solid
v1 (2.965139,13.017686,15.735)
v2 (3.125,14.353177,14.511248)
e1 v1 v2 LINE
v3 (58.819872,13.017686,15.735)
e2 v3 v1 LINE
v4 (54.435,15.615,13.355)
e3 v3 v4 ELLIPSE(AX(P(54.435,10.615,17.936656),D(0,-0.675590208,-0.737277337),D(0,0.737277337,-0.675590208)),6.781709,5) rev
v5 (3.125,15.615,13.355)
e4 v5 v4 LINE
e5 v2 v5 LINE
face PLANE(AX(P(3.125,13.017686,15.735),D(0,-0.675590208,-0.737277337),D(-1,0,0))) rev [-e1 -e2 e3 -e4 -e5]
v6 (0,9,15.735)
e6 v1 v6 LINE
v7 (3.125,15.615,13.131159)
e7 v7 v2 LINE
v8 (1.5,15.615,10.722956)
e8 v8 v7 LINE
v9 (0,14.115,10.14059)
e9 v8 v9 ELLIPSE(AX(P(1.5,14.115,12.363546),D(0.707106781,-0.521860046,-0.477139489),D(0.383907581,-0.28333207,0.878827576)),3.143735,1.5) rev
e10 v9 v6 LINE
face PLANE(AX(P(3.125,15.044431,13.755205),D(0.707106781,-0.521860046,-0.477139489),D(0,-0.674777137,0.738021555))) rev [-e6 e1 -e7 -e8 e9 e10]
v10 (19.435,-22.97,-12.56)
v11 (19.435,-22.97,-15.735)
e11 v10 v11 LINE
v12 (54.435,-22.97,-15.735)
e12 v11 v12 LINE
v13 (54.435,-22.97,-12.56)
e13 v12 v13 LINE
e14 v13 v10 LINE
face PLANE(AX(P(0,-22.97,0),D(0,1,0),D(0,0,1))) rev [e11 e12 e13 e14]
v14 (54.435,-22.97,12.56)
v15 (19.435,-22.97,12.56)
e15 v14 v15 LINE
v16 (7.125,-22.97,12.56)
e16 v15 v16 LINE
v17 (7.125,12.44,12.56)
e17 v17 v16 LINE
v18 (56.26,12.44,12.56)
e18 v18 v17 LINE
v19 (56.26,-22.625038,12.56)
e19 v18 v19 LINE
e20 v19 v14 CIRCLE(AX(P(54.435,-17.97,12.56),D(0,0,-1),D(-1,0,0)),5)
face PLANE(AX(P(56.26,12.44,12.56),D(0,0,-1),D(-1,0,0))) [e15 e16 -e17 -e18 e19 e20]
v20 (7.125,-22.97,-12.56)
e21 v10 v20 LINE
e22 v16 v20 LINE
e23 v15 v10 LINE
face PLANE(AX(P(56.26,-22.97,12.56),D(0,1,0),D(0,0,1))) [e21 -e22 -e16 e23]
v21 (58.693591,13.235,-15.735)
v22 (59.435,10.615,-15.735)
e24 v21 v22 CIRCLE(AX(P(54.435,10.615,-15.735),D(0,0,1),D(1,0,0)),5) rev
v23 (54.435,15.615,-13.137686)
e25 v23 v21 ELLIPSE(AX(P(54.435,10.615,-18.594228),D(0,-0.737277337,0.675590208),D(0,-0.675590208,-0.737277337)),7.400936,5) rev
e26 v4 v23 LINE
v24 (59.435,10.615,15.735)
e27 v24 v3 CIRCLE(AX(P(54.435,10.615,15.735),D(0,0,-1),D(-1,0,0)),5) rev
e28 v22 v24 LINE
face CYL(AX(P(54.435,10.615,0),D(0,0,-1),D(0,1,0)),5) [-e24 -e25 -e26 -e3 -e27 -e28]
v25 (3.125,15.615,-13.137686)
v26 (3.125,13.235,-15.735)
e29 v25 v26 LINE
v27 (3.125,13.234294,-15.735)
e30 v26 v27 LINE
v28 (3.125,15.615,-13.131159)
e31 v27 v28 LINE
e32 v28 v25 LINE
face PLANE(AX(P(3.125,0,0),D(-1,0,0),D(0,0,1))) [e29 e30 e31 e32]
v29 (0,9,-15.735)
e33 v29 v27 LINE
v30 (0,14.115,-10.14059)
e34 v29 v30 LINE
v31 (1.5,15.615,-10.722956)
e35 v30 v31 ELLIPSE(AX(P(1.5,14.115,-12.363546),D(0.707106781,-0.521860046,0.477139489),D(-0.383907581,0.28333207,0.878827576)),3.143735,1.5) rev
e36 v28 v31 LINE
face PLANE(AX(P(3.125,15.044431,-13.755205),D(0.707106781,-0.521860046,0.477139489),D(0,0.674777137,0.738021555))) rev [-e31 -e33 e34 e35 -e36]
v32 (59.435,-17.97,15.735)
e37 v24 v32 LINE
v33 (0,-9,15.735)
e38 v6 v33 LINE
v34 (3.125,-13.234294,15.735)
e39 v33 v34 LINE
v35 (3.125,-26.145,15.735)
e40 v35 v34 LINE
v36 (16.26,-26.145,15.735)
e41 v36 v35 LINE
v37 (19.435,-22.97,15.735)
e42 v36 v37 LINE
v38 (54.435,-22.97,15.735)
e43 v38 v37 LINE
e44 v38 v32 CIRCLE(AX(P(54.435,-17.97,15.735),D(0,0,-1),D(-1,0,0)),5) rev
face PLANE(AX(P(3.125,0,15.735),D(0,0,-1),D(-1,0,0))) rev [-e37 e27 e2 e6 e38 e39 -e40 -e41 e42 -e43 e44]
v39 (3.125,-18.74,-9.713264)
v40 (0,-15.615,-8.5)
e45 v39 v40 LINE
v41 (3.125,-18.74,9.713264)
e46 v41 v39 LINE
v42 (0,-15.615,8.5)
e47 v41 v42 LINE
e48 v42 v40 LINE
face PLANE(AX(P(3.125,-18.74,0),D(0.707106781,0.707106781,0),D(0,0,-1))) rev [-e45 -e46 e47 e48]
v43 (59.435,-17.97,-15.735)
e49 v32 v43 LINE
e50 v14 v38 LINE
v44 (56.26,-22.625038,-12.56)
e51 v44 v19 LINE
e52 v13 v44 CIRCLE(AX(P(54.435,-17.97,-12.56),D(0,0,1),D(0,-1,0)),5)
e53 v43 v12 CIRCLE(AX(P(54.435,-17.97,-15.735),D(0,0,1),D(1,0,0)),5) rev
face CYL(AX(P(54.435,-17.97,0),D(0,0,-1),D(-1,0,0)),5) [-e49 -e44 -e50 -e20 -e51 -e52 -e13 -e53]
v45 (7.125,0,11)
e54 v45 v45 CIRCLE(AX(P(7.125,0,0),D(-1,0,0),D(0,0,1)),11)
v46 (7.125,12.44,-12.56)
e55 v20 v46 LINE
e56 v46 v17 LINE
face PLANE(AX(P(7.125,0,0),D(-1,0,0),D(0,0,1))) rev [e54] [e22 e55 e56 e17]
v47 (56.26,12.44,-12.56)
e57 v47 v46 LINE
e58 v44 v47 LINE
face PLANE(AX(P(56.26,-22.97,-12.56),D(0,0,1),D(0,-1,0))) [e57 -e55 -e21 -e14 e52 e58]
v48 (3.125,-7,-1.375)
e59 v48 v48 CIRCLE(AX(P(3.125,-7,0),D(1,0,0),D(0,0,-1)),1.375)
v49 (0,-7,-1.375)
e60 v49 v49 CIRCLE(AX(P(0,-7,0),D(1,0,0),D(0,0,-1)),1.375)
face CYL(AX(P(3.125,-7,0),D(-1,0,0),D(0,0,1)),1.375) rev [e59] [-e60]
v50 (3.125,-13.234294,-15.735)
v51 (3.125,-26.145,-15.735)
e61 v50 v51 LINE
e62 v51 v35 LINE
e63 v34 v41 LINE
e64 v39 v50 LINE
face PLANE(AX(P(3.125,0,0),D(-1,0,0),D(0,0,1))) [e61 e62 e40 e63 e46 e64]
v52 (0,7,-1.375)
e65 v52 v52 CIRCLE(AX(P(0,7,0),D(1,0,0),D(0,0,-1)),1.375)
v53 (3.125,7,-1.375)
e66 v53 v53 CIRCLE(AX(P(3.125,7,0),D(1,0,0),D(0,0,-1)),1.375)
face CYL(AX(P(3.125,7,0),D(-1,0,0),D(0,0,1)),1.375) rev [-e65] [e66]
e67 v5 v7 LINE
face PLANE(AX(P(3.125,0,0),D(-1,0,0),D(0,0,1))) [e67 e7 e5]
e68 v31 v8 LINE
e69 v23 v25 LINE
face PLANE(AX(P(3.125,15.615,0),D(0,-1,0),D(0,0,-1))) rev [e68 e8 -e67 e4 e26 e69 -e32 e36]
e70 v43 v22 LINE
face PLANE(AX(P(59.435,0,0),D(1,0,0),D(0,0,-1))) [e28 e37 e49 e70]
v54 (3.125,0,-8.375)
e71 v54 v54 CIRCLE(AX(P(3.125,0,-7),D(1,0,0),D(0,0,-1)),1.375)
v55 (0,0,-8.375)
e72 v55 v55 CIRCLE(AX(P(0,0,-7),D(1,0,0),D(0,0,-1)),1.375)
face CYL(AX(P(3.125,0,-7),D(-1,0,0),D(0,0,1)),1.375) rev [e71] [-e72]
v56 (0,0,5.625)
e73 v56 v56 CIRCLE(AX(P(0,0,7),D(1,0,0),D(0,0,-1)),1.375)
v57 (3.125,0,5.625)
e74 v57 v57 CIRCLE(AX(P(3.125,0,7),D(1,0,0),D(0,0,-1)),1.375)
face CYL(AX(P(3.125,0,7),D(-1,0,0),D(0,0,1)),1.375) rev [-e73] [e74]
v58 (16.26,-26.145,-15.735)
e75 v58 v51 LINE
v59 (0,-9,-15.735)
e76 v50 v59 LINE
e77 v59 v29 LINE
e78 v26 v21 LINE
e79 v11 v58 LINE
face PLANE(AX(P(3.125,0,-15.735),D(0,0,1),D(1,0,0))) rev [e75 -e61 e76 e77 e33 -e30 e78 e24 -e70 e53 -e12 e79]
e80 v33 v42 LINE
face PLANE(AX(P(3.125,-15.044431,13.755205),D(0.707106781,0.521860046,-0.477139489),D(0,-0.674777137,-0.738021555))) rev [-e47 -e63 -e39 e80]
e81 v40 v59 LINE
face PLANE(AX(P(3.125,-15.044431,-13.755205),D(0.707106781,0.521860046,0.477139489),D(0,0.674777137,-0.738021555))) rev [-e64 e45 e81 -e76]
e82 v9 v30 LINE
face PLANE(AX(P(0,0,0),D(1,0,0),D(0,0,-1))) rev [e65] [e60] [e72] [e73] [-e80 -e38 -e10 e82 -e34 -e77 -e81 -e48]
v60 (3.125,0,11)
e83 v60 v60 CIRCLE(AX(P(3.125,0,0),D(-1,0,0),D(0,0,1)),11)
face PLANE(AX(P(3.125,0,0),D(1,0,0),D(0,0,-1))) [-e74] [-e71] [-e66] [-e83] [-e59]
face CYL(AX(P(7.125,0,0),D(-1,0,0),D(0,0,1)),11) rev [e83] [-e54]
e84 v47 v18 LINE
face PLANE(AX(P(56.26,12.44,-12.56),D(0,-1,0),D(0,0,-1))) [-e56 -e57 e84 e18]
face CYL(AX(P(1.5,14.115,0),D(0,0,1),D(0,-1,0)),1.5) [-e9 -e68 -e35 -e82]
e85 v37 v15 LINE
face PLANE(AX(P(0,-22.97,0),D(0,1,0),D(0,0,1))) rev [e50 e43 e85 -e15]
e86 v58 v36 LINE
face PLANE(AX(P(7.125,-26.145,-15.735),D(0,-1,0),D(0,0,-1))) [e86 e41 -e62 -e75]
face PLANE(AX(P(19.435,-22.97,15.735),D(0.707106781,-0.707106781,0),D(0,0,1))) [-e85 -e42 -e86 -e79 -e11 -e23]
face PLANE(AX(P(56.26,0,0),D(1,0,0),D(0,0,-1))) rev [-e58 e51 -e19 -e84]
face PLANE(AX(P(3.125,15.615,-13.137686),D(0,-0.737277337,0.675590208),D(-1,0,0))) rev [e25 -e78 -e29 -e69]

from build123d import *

# Parameters (mm, degrees)
SKETCH2_R           = 1.375
BOSS_EXTRUDE1_DEPTH = 3.125
SKETCH3_R           = 11
BOSS_EXTRUDE2_DEPTH = 4
FILLET1_SIZE        = 3.125
SKETCH4_W           = 31.47
SKETCH4_H           = 41.76
SKETCH4_W_2         = 25.12
SKETCH4_H_2         = 35.41
BOSS_EXTRUDE3_DEPTH = 49.135
CHAMFER1_SIZE       = 2.38
CHAMFER1_SIZE_2     = 2.597314233
BOSS_EXTRUDE4_DEPTH = 3.175
SKETCH6_W           = 40
SKETCH6_H           = 31.47
CUT_EXTRUDE1_DEPTH  = 3.175
CHAMFER2_SIZE       = 3.175
FILLET3_R           = 5
FILLET4_R           = 5
FILLET5_R           = 1.5


# Some blends are built 0.0001 mm under size
with BuildPart() as part:
    # Sketch2 → Boss-Extrude1 (new body)
    with BuildSketch(Plane(origin=(0, 0, 0), x_dir=(0, 0, -1), z_dir=(1, 0, 0))):
        Polygon((0, 15.615), (-8.5, 15.615), (-15.735, 9), (-15.735, 0), (-15.735, -9), (-8.5, -15.615), (0, -15.615), (8.5, -15.615), (15.735, -9), (15.735, 0), (15.735, 9), (8.5, 15.615), align=None)
        with Locations((0, 7)):
            Circle(SKETCH2_R, mode=Mode.SUBTRACT)
        with Locations((-7, 0)):
            Circle(SKETCH2_R, mode=Mode.SUBTRACT)
        with Locations((7, 0)):
            Circle(SKETCH2_R, mode=Mode.SUBTRACT)
        with Locations((0, -7)):
            Circle(SKETCH2_R, mode=Mode.SUBTRACT)
    extrude(amount=BOSS_EXTRUDE1_DEPTH)

    # Sketch3 → Boss-Extrude2 (add)
    with BuildSketch(Plane.ZY.offset(-3.125)):
        Polygon((-15.735, -9), (-15.735, -26.145), (15.735, -26.145), (15.735, -9), (15.735, 9), (15.735, 15.615), (8.5, 15.615), (-8.5, 15.615), (-15.735, 15.615), (-15.735, 9), align=None)
        Circle(SKETCH3_R, mode=Mode.SUBTRACT)
    extrude(amount=-BOSS_EXTRUDE2_DEPTH)

    # Fillet1
    fillet1_edges = [part.edges().sort_by_distance(p)[0] for p in [
        (3.125, 12.3075, 12.1175),
        (3.125, 12.3075, -12.1175),
        (3.125, -12.3075, -12.1175),
        (3.125, -15.615, 0),
        (3.125, -12.3075, 12.1175),
    ]]
    chamfer(fillet1_edges, length=FILLET1_SIZE - 0.0001)  # a hair under: the kernel refuses the full size

    # Sketch4 → Boss-Extrude3 (add)
    with BuildSketch(Plane(origin=(7.125, 0, 0), x_dir=(0, 0, -1), z_dir=(1, 0, 0))):
        with Locations((0, -5.265)):
            Rectangle(SKETCH4_W, SKETCH4_H)
        with Locations((0, -5.265)):
            Rectangle(SKETCH4_W_2, SKETCH4_H_2, mode=Mode.SUBTRACT)
    extrude(amount=BOSS_EXTRUDE3_DEPTH)

    # Chamfer1
    # the kernel refuses this chamfer: 2.597314233, 2.38 mm, written as the material it takes off along each edge
    with BuildSketch(Plane(origin=(-3.562082301, 15.615, 15.735), x_dir=(0, 0.031246667353746232, -0.9995117036729906), z_dir=(1, 0, 0))) as chamfer1_piece_1:
        Polygon((CHAMFER1_SIZE * 0.999511703673, -CHAMFER1_SIZE * 0.0312466673537), (-CHAMFER1_SIZE_2 * 0.0312466673483, -CHAMFER1_SIZE_2 * 0.999511703498), (0, 0), align=None)
    extrude(amount=66.509164603, mode=Mode.SUBTRACT)
    with BuildSketch(Plane(origin=(62.947082301, 15.615, -15.735), x_dir=(0, 0.02624044362699192, 0.999655660274206), z_dir=(-1, 0, 0))) as chamfer1_piece_2:
        Polygon((CHAMFER1_SIZE_2 * 0.999655660099, -CHAMFER1_SIZE_2 * 0.0262404436224), (-CHAMFER1_SIZE * 0.026240443627, -CHAMFER1_SIZE * 0.999655660274), (0, 0), align=None)
    extrude(amount=66.509164603, mode=Mode.SUBTRACT)

    # Sketch5 → Boss-Extrude4 (add)
    with BuildSketch(Plane(origin=(56.26, 0, 0), x_dir=(0, 0, -1), z_dir=(1, 0, 0))):
        Polygon((13.137685767, 15.615), (-13.355, 15.615), (-15.735, 13.017685767), (-15.735, -26.145), (15.735, -26.145), (15.735, 13.235), align=None)
    extrude(amount=BOSS_EXTRUDE4_DEPTH)

    # Sketch6 → Cut-Extrude1 (cut)
    with BuildSketch(Plane.XZ.offset(26.145)):
        with Locations((39.435, 0)):
            Rectangle(SKETCH6_W, SKETCH6_H)
    extrude(amount=-CUT_EXTRUDE1_DEPTH, mode=Mode.SUBTRACT)

    # Chamfer2
    chamfer2_edges = [part.edges().sort_by_distance(p)[0] for p in [
        (19.435, -26.145, 0),
    ]]
    chamfer(chamfer2_edges, length=CHAMFER2_SIZE - 0.0001)  # a hair under: the kernel refuses the full size

    # Fillet3
    fillet3_edges = [part.edges().sort_by_distance(p)[0] for p in [
        (59.435, 15.615, 0.108657116),
    ]]
    fillet(fillet3_edges, radius=FILLET3_R)

    # Fillet4
    # the kernel refuses this fillet: 5 mm, written as the material it takes off along each edge
    with BuildSketch(Plane(origin=(59.435, -22.97, -28.235), x_dir=(0, 1, 0), z_dir=(0, 0, 1))) as fillet4_piece_1:
        with BuildLine():
            CenterArc((FILLET4_R, FILLET4_R), FILLET4_R, 180, 90)
            Line((0, FILLET4_R), (0, 0))
            Line((0, 0), (FILLET4_R, 0))
        make_face()
    extrude(amount=56.47, mode=Mode.SUBTRACT)

    # Fillet5
    fillet5_edges = [part.edges().sort_by_distance(p)[0] for p in [
        (0, 15.615, 0),
    ]]
    fillet(fillet5_edges, radius=FILLET5_R)


solid = part.part
